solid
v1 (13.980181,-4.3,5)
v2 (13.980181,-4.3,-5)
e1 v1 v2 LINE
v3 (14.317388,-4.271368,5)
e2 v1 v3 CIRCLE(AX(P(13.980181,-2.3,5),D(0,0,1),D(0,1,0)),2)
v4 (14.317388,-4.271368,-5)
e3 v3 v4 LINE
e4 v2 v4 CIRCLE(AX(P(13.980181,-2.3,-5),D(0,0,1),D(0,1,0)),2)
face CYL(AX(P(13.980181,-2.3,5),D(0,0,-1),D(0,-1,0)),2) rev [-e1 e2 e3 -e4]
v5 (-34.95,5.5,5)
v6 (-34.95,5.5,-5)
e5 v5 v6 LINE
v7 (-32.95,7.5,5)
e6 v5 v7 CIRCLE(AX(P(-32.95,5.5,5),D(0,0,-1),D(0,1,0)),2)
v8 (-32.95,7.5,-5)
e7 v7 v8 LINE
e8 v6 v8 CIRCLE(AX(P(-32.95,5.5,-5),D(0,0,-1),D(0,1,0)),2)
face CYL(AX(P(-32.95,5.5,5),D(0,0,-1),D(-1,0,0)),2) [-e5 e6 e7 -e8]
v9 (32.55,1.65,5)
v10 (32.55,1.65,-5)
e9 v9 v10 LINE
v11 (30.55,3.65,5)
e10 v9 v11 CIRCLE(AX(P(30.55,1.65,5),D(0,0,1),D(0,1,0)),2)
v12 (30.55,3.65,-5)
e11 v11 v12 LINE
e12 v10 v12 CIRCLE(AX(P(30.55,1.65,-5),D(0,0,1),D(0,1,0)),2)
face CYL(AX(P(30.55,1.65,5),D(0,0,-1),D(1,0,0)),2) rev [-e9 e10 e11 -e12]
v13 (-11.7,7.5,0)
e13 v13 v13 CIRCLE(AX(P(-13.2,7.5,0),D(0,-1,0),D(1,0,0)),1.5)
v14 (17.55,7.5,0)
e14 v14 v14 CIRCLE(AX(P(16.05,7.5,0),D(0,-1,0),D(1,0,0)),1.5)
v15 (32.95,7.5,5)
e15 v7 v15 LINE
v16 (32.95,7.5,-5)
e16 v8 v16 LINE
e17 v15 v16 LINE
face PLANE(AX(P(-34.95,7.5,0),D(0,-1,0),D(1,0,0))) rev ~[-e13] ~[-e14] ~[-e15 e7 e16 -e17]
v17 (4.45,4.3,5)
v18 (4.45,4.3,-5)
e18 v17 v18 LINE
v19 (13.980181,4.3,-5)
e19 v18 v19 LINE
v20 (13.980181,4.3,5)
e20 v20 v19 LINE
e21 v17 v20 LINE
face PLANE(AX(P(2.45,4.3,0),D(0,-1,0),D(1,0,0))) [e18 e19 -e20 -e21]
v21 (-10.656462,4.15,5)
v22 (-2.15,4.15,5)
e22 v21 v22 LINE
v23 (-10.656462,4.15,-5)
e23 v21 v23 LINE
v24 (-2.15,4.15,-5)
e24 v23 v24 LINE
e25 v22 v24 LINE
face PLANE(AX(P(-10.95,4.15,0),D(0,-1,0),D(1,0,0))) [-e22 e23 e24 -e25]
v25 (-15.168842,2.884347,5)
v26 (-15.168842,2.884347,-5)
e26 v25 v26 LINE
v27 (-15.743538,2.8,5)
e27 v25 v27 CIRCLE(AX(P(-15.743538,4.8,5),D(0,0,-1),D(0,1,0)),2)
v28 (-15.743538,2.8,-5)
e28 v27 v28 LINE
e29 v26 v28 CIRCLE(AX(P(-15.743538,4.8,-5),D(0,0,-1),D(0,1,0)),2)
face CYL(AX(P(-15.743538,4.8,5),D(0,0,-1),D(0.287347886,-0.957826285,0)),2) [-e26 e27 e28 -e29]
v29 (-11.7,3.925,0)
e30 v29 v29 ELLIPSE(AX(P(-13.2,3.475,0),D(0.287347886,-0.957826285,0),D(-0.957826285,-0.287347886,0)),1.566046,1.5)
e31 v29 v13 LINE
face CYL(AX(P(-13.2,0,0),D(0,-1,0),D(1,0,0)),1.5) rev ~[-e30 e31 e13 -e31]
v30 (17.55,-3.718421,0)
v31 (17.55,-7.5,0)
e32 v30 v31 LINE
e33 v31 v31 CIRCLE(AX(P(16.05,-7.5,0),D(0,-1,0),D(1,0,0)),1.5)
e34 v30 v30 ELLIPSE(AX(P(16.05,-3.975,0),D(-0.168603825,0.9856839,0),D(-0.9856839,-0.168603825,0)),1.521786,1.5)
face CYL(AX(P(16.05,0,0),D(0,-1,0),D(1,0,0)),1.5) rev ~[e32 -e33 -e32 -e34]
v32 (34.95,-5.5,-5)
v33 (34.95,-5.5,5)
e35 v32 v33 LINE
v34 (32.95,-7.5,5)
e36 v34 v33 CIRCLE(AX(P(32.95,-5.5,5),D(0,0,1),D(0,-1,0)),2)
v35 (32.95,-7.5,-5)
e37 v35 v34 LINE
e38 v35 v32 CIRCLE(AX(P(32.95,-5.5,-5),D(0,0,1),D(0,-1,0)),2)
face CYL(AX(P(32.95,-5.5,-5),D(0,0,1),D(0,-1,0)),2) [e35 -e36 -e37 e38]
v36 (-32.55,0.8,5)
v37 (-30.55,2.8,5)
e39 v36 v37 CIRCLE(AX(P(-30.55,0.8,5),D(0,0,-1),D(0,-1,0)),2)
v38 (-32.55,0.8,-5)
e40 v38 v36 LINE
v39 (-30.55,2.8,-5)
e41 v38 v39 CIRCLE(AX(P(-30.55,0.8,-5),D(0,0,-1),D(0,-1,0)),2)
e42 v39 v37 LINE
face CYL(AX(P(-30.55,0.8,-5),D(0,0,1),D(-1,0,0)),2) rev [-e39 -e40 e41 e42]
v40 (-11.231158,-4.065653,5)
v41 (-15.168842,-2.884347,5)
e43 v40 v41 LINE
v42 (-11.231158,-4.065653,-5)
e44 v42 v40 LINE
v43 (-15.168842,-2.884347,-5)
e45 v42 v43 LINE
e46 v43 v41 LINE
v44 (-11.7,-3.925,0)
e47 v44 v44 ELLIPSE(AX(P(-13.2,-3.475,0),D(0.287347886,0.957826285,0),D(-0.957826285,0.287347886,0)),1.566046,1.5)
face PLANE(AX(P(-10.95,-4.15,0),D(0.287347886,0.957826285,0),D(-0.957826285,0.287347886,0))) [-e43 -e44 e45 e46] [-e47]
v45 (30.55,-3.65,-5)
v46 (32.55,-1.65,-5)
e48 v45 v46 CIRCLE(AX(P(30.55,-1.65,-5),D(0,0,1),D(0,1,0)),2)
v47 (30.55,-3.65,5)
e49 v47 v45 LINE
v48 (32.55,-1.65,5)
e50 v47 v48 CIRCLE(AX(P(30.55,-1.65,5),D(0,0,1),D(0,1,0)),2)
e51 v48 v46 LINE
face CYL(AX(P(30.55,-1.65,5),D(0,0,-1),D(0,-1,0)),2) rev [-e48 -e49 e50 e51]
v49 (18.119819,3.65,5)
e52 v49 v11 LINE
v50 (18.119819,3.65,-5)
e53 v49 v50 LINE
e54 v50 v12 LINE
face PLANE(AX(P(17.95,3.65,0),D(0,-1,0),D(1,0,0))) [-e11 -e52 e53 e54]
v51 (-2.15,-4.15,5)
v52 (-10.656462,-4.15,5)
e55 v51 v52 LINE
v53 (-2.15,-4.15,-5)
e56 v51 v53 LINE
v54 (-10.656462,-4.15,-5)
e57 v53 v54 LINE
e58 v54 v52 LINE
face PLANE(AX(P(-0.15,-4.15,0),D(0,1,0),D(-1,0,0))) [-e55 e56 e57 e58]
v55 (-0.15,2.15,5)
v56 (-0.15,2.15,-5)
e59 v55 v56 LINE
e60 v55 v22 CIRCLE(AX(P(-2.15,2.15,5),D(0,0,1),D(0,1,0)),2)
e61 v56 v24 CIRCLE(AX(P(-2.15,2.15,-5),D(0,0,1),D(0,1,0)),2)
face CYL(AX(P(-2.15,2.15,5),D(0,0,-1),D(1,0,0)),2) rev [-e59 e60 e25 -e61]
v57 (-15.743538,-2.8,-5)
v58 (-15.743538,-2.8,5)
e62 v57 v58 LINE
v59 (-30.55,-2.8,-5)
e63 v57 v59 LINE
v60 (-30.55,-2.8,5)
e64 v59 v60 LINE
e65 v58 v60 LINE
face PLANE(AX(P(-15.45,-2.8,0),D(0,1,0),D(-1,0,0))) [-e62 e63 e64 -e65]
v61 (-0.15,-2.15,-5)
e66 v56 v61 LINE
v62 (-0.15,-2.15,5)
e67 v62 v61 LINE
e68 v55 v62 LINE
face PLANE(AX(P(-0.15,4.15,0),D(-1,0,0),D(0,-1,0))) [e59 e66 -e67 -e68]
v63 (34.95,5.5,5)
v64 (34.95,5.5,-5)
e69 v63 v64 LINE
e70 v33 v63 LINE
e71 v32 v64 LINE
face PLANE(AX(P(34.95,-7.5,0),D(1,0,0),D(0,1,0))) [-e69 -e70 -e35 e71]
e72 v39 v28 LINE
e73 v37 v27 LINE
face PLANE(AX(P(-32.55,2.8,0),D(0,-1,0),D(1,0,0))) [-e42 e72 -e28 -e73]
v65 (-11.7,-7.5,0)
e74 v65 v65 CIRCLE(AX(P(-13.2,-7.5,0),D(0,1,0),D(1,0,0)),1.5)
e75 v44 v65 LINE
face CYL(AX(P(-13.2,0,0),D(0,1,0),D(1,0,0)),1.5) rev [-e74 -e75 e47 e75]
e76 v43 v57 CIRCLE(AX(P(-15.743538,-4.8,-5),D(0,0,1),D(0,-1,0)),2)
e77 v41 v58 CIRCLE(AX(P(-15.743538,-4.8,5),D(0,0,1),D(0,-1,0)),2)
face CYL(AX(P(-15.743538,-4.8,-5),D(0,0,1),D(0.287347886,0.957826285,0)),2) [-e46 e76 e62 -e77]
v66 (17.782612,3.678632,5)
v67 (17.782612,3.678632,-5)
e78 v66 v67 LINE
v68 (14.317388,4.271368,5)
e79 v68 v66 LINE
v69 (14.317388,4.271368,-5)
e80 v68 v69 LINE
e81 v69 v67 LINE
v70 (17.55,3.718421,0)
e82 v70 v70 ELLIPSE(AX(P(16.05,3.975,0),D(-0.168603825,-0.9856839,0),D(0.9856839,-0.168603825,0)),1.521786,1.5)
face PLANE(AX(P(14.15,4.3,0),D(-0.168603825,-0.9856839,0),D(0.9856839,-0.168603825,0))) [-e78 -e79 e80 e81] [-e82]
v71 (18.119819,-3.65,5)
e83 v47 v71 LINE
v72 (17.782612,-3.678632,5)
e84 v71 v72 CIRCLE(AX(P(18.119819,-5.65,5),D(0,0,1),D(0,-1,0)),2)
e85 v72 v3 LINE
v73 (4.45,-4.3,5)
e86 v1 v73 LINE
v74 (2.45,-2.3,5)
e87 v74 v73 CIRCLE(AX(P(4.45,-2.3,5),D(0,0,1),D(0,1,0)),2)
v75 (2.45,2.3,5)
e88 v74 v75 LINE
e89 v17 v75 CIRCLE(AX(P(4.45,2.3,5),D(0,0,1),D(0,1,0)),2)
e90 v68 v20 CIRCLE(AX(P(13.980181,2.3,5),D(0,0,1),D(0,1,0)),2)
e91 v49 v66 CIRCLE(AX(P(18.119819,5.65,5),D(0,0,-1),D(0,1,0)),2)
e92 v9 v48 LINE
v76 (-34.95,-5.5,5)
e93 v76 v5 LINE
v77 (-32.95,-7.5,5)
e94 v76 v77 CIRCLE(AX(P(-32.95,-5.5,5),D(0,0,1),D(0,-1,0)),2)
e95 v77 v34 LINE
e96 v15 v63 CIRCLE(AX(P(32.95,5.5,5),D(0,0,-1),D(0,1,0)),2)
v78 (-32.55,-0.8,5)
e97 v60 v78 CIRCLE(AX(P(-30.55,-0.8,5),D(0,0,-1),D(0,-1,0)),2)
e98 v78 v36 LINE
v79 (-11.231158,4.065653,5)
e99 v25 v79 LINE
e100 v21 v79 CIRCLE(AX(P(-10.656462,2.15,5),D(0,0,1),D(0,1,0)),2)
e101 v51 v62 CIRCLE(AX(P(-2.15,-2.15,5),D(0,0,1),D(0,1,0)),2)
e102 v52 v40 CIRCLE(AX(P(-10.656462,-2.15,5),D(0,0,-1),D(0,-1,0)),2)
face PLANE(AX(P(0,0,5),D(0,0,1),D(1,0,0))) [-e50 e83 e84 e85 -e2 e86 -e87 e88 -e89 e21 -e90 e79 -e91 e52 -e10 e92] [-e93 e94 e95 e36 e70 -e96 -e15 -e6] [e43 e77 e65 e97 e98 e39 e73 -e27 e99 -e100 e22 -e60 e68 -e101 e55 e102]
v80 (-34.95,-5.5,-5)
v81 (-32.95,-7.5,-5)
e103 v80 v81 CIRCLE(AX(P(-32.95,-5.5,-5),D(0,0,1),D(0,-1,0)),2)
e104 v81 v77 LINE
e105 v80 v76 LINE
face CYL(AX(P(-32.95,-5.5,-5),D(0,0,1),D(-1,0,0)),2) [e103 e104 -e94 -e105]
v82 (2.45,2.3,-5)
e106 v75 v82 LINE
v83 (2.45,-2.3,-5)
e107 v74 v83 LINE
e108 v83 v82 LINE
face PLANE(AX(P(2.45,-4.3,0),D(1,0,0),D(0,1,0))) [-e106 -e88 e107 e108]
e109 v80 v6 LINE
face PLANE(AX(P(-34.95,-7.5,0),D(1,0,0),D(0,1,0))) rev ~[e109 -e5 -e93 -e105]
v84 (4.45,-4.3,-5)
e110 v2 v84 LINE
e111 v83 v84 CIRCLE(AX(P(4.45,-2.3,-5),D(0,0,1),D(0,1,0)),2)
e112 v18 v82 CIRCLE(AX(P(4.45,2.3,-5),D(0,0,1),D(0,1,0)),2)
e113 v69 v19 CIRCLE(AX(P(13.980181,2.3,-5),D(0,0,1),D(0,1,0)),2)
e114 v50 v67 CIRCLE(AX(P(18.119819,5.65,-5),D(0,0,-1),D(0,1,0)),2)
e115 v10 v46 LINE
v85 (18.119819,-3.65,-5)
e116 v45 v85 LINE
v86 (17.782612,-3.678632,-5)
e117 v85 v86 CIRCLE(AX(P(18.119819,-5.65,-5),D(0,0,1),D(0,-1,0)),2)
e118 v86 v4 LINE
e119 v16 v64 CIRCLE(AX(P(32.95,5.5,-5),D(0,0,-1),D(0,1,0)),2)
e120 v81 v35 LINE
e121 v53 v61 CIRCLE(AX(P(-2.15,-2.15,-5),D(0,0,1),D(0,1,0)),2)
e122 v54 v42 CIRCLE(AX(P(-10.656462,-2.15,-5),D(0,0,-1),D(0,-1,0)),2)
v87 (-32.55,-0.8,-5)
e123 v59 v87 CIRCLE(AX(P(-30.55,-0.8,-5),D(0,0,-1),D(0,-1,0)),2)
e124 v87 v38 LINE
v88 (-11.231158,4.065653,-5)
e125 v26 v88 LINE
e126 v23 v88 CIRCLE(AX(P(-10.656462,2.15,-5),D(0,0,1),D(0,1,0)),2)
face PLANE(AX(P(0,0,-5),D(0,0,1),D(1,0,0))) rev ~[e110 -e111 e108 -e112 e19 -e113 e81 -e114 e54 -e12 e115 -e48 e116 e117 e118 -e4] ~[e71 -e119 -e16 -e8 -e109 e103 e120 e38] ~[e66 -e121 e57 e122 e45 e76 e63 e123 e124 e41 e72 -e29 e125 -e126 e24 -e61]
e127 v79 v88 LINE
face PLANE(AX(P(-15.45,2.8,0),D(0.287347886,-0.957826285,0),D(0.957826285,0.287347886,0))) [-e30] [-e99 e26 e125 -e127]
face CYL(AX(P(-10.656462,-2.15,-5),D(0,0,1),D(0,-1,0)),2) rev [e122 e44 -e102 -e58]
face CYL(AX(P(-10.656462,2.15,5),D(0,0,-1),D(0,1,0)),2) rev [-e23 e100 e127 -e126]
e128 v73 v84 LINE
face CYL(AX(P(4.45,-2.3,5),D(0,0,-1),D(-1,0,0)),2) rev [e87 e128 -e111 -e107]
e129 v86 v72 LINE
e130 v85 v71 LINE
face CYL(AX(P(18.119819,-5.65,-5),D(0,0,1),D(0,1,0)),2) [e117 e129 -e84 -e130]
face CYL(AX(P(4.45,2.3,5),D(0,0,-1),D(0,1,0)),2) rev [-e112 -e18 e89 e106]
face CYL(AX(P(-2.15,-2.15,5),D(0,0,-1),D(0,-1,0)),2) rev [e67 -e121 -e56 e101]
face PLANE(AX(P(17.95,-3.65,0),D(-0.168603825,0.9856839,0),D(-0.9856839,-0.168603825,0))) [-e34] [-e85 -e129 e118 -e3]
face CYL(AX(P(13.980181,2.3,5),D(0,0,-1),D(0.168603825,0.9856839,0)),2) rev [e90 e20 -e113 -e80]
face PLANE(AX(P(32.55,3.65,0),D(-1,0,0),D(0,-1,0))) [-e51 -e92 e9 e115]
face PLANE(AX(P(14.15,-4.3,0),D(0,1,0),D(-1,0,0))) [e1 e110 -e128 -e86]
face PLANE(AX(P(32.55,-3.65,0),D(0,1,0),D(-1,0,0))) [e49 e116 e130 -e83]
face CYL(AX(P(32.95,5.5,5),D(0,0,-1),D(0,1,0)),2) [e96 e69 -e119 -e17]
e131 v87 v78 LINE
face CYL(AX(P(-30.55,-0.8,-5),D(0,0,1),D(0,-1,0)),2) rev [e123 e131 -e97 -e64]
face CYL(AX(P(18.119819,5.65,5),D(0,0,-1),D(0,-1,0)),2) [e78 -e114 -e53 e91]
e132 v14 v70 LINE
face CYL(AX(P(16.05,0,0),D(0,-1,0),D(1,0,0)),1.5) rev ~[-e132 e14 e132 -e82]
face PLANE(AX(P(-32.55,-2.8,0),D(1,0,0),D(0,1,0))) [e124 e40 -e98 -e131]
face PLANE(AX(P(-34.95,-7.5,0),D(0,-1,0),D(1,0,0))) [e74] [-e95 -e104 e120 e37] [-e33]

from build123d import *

# Parameters (mm, degrees)
F0_W     = 69.9
F0_H     = 15
F1_DEPTH = 5
F2_R     = 1.5
F3_DEPTH = 12.5
F4_R     = 2
F5_R     = 2


with BuildPart() as f1:
    # F0 (on Top) → F1 (new body, symmetric)
    with BuildSketch(Plane.XY):
        Rectangle(F0_W, F0_H)
        Polygon((-10.95, -4.15), (-15.45, -2.8), (-32.55, -2.8), (-32.55, 2.8), (-15.45, 2.8), (-10.95, 4.15), (-0.15, 4.15), (-0.15, -4.15), align=None, mode=Mode.SUBTRACT)
        Polygon((17.95, -3.65), (14.15, -4.3), (2.45, -4.3), (2.45, 4.3), (14.15, 4.3), (17.95, 3.65), (32.55, 3.65), (32.55, -3.65), align=None, mode=Mode.SUBTRACT)
    extrude(amount=F1_DEPTH, both=True)

    # F2 (on Front) → F3 (cut, symmetric)
    with BuildSketch(Plane.XZ):
        with Locations((-13.2, 0)):
            Circle(F2_R)
        with Locations((16.05, 0)):
            Circle(F2_R)
    extrude(amount=F3_DEPTH, both=True, mode=Mode.SUBTRACT)

    # F4
    f4_edges = [f1.edges().sort_by_distance(p)[0] for p in [
        (-34.95, 7.5, 0),
        (-34.95, -7.5, 0),
        (34.95, -7.5, 0),
        (34.95, 7.5, 0),
    ]]
    fillet(f4_edges, radius=F4_R)

    # F5
    f5_edges = [f1.edges().sort_by_distance(p)[0] for p in [
        (-32.55, 2.8, 0),
        (32.55, 3.65, 0),
        (32.55, -3.65, 0),
        (-32.55, -2.8, 0),
        (-15.45, 2.8, 0),
        (-10.95, 4.15, 0),
        (14.15, 4.3, 0),
        (17.95, 3.65, 0),
        (-15.45, -2.8, 0),
        (-10.95, -4.15, 0),
        (14.15, -4.3, 0),
        (17.95, -3.65, 0),
        (-0.15, 4.15, 0),
        (-0.15, -4.15, 0),
        (2.45, -4.3, 0),
        (2.45, 4.3, 0),
    ]]
    fillet(f5_edges, radius=F5_R)


solid = f1.part
